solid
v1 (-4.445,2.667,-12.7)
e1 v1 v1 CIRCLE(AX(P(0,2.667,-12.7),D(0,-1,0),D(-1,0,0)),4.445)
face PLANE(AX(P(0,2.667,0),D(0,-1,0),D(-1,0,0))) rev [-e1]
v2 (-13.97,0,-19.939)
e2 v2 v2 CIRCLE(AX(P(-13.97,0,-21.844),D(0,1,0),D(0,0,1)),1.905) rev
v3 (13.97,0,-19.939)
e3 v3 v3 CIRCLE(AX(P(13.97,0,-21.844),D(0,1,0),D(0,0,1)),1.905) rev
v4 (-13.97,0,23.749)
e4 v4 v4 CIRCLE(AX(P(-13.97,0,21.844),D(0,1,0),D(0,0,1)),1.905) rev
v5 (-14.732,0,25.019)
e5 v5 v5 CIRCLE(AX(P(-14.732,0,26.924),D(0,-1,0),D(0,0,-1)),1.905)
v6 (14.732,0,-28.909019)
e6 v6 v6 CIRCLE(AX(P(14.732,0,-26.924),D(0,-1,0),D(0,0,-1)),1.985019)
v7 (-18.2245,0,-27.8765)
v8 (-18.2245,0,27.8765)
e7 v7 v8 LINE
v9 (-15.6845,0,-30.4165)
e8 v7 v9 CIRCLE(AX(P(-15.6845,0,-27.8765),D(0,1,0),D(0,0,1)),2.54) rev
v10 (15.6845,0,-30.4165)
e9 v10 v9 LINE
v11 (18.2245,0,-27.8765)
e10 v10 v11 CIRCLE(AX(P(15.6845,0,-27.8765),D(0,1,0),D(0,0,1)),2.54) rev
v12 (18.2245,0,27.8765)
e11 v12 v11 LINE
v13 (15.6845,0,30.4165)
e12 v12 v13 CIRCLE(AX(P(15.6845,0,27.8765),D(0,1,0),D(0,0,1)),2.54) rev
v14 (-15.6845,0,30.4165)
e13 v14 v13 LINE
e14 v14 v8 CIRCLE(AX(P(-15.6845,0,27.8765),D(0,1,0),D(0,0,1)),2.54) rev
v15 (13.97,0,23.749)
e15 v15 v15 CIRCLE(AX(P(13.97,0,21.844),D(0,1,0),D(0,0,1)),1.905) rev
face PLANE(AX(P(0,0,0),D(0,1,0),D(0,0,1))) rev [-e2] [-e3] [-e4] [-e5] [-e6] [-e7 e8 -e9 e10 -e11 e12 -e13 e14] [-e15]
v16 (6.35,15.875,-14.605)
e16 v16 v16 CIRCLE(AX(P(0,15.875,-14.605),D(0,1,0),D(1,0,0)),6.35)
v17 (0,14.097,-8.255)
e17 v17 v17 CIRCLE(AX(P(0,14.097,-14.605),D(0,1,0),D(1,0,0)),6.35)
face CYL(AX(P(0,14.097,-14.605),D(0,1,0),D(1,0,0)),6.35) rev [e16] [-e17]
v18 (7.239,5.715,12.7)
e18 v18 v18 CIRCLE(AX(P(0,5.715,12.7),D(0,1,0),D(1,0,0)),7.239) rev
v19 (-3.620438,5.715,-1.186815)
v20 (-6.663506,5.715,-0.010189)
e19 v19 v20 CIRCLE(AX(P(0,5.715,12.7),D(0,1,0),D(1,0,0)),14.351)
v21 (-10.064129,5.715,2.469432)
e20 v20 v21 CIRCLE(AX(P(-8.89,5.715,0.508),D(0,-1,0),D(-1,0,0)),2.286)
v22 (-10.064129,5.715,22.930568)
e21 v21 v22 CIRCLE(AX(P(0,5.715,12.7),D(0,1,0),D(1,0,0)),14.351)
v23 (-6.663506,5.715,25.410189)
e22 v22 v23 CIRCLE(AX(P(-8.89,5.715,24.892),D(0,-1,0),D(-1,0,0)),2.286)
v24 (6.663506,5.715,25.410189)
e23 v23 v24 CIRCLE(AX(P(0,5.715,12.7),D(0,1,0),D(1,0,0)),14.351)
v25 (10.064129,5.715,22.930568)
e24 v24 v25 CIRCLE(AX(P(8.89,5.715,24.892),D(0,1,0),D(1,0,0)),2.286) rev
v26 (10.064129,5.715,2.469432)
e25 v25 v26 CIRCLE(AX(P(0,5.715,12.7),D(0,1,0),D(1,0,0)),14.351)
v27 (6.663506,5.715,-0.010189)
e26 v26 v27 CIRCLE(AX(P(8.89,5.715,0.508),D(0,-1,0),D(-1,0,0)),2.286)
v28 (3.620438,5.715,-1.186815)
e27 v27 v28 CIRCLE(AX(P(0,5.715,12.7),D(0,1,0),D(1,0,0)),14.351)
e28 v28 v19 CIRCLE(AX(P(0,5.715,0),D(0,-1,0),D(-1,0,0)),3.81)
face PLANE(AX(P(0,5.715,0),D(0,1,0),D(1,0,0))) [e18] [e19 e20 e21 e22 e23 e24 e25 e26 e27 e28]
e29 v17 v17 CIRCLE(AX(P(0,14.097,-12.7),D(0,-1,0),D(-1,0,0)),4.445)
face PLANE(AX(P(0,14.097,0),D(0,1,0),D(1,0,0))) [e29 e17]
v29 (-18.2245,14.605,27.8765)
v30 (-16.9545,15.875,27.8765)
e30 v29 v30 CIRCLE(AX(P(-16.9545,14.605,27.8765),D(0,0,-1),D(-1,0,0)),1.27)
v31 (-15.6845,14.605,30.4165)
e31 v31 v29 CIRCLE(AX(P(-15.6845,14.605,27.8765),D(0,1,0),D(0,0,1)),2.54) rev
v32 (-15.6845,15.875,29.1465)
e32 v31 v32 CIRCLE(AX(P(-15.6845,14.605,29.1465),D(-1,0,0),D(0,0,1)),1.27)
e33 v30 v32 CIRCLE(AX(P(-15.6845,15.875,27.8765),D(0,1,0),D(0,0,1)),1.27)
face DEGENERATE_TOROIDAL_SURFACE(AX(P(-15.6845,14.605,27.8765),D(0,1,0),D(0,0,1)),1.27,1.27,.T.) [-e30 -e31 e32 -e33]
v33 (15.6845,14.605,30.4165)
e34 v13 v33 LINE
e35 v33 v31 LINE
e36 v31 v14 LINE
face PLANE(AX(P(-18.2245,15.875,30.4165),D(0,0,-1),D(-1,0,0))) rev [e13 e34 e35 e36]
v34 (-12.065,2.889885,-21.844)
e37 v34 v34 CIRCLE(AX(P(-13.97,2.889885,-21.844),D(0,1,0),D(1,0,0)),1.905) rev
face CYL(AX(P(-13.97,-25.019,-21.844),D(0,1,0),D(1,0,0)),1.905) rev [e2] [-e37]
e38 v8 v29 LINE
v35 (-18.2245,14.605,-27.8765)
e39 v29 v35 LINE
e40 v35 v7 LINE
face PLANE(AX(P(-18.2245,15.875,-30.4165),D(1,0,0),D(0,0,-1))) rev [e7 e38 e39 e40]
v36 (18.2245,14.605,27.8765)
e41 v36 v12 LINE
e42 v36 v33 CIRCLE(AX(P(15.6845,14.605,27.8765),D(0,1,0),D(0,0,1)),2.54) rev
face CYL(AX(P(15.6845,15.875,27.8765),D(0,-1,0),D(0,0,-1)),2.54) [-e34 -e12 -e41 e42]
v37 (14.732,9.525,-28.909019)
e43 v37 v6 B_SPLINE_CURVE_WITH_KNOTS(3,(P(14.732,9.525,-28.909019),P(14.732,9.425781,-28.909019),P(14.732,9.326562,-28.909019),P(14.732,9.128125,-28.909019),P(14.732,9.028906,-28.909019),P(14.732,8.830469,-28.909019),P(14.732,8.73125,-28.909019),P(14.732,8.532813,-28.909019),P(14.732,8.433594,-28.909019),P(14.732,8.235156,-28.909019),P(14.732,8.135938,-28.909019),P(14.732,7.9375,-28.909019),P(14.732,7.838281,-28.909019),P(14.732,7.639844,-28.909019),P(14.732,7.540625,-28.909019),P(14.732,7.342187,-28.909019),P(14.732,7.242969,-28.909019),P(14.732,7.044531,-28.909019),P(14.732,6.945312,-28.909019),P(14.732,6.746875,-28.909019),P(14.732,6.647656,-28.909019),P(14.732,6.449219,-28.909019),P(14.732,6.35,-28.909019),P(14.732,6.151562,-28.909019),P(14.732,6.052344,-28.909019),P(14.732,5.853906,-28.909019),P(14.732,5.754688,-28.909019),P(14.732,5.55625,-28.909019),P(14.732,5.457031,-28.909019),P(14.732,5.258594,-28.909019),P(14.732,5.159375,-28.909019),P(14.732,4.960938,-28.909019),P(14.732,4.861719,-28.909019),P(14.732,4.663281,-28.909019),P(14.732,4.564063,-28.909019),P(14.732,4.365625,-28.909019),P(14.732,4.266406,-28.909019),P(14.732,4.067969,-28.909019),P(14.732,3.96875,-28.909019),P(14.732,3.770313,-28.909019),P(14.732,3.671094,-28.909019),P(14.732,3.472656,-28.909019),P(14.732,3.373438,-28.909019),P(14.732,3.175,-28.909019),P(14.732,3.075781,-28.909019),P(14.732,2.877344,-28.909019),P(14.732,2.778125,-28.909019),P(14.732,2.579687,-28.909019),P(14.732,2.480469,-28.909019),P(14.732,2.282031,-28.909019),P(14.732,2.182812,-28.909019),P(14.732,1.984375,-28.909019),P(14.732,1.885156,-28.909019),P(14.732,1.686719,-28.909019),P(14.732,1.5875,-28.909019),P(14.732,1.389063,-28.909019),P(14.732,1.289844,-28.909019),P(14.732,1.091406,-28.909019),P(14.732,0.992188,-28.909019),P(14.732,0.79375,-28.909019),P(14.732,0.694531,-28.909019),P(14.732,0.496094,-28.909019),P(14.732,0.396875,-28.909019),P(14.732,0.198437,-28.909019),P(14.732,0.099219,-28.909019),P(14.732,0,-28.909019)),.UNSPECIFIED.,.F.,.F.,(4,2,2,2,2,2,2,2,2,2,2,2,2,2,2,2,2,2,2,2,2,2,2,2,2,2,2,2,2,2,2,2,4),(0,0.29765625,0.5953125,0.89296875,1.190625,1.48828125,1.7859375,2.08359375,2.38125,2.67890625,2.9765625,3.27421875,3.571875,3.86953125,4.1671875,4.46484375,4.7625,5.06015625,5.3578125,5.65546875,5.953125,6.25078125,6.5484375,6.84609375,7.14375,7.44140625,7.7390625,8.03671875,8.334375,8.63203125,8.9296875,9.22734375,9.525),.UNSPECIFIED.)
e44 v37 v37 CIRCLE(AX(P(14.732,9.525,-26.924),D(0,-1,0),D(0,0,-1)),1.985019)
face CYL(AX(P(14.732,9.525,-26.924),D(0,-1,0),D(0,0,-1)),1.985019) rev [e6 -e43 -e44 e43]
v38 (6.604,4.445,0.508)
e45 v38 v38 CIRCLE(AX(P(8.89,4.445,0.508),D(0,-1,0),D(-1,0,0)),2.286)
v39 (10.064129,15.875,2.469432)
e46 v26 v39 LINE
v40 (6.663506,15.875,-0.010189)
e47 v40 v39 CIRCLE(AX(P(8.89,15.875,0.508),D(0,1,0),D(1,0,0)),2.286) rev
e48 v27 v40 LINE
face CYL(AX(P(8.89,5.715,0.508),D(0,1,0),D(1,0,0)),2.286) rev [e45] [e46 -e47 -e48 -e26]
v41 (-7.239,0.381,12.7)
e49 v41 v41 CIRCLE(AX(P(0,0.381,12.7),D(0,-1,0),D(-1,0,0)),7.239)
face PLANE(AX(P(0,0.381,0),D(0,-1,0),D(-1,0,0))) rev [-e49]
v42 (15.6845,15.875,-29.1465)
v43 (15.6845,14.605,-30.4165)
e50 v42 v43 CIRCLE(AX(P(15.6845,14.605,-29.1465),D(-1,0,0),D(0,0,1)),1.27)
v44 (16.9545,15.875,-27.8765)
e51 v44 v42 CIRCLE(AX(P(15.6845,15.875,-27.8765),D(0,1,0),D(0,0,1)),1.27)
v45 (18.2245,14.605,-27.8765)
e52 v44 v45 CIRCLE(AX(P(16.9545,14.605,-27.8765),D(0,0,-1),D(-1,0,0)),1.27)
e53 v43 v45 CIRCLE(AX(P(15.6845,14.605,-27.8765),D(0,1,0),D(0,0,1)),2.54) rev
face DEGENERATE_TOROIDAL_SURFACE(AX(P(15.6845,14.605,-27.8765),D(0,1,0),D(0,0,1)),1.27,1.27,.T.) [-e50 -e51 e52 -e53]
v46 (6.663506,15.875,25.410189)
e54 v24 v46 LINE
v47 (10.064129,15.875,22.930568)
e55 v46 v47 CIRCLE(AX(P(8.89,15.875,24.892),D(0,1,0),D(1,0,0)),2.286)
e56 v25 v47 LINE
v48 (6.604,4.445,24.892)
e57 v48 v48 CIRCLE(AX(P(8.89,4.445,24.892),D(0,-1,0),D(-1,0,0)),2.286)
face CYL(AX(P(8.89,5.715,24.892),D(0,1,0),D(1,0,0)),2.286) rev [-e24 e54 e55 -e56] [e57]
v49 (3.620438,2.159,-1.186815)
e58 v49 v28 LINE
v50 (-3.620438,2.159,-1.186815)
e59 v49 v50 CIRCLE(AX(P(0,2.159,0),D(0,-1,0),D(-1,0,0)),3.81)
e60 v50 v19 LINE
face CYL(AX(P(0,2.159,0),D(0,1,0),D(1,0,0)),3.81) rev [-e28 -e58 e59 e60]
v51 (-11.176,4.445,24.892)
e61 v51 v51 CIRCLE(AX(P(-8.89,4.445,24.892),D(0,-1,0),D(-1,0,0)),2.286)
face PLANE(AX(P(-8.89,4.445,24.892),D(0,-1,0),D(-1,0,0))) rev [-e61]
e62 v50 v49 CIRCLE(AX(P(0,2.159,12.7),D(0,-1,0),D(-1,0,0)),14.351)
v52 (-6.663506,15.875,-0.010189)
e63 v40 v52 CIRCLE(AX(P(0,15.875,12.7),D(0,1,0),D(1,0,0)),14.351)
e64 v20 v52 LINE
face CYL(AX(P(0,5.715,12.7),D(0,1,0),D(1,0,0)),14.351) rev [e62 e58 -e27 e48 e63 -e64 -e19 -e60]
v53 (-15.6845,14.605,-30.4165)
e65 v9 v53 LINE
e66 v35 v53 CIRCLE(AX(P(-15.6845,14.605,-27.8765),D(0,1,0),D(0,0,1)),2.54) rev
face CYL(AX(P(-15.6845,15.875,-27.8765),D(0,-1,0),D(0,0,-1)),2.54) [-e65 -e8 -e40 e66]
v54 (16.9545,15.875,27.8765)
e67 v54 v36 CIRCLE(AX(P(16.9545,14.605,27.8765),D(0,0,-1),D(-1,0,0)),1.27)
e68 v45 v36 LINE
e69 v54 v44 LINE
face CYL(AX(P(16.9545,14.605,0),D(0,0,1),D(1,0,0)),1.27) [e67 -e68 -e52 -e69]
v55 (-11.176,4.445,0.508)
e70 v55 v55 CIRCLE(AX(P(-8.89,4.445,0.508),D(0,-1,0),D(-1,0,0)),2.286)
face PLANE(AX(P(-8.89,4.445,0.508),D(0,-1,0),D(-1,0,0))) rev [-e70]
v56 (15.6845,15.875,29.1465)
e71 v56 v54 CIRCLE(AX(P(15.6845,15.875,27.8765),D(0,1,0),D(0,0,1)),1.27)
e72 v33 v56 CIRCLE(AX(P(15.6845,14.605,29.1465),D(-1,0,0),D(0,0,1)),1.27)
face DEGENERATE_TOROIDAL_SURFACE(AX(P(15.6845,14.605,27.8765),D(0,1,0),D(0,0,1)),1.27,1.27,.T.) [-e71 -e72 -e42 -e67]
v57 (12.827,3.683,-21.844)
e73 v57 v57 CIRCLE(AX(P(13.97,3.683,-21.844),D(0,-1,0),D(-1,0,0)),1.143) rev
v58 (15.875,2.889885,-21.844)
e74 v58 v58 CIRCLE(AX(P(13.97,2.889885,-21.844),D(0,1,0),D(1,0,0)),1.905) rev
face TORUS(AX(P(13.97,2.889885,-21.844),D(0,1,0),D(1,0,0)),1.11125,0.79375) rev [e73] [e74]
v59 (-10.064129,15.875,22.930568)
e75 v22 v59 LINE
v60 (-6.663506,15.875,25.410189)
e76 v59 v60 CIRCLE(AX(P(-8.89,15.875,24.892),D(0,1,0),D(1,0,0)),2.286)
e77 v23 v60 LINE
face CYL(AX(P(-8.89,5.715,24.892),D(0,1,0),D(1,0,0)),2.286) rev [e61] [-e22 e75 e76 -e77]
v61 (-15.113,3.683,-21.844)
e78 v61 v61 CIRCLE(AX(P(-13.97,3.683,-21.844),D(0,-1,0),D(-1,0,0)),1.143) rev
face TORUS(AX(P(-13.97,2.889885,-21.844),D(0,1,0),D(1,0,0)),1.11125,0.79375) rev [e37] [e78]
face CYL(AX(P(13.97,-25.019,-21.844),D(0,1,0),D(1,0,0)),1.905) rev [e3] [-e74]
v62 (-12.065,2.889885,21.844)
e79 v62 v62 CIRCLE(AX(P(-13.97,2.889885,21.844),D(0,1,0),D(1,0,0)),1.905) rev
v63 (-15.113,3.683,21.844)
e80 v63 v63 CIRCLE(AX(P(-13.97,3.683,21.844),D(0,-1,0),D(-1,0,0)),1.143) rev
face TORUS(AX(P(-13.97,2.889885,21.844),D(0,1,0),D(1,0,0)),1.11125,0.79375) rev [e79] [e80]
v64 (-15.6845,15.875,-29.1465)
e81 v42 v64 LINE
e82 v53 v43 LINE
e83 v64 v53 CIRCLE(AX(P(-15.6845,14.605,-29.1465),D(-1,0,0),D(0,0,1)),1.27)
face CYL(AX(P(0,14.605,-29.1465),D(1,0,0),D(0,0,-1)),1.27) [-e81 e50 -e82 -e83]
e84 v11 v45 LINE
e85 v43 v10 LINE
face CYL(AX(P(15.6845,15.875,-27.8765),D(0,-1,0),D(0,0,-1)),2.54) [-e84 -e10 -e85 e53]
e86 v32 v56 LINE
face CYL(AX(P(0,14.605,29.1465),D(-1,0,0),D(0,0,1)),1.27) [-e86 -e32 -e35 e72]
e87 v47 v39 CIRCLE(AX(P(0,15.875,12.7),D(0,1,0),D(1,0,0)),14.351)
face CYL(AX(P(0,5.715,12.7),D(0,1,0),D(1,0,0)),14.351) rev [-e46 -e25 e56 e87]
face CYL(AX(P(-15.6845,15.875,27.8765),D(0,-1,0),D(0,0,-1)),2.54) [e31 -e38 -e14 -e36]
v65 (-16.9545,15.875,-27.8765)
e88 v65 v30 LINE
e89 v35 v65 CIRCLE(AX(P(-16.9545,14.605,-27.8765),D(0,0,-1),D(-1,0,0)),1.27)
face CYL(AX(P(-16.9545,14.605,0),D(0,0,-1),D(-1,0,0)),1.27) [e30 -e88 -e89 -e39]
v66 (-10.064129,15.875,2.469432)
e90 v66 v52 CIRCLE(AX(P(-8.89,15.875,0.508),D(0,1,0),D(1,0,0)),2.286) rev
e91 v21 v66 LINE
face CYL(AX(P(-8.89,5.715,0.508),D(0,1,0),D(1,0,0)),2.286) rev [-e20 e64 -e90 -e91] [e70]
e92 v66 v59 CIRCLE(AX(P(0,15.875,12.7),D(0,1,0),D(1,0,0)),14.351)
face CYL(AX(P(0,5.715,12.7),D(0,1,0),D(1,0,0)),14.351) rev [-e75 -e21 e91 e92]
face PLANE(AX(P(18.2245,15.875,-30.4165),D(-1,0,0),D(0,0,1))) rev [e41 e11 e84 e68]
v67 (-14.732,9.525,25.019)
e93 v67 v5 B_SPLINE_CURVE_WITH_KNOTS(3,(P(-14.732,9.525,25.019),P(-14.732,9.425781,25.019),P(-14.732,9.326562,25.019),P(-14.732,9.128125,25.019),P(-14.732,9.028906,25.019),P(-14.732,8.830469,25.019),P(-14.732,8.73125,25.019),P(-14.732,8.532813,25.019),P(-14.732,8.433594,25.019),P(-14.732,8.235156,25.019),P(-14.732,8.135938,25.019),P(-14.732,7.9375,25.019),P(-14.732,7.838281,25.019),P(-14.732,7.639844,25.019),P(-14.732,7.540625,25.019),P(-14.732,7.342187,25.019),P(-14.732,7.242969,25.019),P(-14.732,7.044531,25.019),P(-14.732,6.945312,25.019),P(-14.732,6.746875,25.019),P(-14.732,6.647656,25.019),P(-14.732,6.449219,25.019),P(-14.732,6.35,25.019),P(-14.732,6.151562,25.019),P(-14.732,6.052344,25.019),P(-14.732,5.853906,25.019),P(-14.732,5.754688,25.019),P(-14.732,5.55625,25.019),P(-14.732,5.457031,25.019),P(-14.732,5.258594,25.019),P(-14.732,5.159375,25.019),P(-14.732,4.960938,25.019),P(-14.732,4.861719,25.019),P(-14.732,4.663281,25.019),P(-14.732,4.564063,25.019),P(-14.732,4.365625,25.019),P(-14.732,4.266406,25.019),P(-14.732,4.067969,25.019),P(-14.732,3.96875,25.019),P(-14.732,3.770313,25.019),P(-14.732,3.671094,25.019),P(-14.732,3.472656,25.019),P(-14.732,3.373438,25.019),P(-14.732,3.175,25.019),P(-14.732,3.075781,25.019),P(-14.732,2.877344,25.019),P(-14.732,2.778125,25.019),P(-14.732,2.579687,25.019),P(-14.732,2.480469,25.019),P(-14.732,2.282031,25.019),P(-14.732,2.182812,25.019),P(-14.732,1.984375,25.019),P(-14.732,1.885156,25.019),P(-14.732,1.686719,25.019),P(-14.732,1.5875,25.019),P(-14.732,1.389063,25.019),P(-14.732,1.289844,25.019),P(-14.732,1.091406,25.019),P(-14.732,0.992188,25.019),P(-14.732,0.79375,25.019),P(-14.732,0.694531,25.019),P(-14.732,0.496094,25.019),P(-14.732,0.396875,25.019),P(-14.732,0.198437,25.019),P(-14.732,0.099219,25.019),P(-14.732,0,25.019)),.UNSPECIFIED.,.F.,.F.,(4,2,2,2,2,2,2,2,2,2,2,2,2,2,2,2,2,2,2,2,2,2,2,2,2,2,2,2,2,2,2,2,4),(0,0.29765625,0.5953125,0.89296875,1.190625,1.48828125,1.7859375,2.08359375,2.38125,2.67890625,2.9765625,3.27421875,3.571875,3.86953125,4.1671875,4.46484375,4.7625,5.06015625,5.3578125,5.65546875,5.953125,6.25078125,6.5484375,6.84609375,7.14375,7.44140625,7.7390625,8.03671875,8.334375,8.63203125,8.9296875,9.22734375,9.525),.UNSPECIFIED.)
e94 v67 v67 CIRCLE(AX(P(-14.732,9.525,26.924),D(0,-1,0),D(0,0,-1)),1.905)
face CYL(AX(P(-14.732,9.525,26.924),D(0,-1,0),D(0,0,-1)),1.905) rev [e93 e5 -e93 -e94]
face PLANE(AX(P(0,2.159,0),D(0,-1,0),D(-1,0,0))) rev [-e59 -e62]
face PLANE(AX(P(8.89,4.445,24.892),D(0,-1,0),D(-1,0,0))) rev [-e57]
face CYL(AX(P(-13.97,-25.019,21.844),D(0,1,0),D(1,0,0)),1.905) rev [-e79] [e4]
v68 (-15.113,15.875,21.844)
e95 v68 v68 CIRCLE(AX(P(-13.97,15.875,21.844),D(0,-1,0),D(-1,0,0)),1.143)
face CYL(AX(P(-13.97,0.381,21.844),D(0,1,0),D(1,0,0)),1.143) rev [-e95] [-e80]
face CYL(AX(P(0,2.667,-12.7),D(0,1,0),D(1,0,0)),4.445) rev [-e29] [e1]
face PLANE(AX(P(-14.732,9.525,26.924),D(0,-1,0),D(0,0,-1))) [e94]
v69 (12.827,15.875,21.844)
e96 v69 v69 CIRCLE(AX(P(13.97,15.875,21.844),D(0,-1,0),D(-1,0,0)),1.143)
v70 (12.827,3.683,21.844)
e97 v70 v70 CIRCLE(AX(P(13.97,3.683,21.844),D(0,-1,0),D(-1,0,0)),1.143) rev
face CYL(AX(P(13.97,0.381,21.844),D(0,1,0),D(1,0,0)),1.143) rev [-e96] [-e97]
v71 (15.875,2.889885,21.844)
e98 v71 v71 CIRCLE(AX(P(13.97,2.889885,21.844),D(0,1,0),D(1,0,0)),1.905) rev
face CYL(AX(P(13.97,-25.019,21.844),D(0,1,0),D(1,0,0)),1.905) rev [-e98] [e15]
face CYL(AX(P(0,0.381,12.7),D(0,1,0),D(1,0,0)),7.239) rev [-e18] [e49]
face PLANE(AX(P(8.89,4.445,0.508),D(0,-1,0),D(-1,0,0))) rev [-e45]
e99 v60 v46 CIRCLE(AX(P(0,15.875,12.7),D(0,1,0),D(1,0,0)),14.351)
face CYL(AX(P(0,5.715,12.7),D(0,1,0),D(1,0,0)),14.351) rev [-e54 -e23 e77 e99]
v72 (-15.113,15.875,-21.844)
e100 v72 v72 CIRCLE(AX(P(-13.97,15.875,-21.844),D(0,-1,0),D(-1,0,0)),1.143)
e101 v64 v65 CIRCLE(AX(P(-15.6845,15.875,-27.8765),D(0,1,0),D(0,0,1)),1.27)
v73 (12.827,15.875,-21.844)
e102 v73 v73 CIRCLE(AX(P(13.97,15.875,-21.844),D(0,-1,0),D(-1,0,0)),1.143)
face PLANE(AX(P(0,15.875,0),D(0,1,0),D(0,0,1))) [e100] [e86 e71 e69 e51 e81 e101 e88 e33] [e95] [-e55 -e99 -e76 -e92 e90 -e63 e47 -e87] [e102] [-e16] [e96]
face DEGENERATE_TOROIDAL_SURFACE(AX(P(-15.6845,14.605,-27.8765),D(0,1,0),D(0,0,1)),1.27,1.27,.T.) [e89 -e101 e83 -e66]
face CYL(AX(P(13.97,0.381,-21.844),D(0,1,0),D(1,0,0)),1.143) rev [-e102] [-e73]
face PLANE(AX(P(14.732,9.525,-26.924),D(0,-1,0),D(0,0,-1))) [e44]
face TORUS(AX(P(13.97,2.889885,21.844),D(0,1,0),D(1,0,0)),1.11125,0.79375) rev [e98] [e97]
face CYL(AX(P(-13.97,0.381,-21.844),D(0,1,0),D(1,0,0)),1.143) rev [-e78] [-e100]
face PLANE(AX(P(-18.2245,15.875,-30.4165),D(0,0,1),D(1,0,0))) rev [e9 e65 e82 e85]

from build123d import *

# Parameters (mm, degrees)
SKETCH1_W           = 36.449
SKETCH1_H           = 60.833
BOSS_EXTRUDE1_DEPTH = 15.875
CAVITY1_START       = 5.715
CAVITY1_OUTLINE_R   = 4.445
CAVITY1_DEPTH       = 10.16
CAVITY1_START_2     = 0.381
CAVITY1_2_OUTLINE_R = 7.239
CAVITY1_2_DEPTH     = 5.334
CAVITY1_START_3     = 2.667
CAVITY1_3_OUTLINE_R = 4.445
CAVITY1_3_DEPTH     = 3.048
CAVITY1_START_4     = 14.097
CAVITY1_4_DEPTH     = 1.778
CAVITY1_START_5     = 4.445
CAVITY1_5_OUTLINE_R = 2.286
CAVITY1_5_DEPTH     = 1.27
CAVITY1_START_6     = 2.159
CAVITY1_6_DEPTH     = 0.508
FILLET1_R           = 2.54
SKETCH5_R           = 1.905
SKETCH5_R_2         = 1.985019455
CUT_EXTRUDE1_DEPTH  = 9.525
FILLET2_R           = 1.27


# Read off the part's stored shape, not the designer's step: Cavity1
with BuildPart() as part:
    # Sketch1 → Boss-Extrude1 (new body)
    with BuildSketch(Plane(origin=(0, 0, 0), x_dir=(1, 0, 0), z_dir=(0, 1, 0))):
        Rectangle(SKETCH1_W, SKETCH1_H)
    extrude(amount=BOSS_EXTRUDE1_DEPTH)

    # Cavity1 outline → Cavity1 (cut)
    with BuildSketch(Plane(origin=(0, 0, 0), x_dir=(1, 0, 0), z_dir=(0, 1, 0)).offset(CAVITY1_START)):
        with BuildLine():
            ThreePointArc((6.663505747, 0.010188518), (0, 1.651), (-6.663505747, 0.010188518))
            ThreePointArc((-6.663505747, 0.010188518), (-10.236847552, 1.339105214), (-10.064128852, -2.469432496))
            ThreePointArc((-10.064128852, -2.469432496), (-14.351, -12.7), (-10.064128852, -22.930567504))
            ThreePointArc((-10.064128852, -22.930567504), (-10.236847552, -26.739105214), (-6.663505747, -25.410188518))
            ThreePointArc((-6.663505747, -25.410188518), (0, -27.051), (6.663505747, -25.410188518))
            ThreePointArc((6.663505747, -25.410188518), (10.236847552, -26.739105214), (10.064128852, -22.930567504))
            ThreePointArc((10.064128852, -22.930567504), (14.351, -12.7), (10.064128852, -2.469432496))
            ThreePointArc((10.064128852, -2.469432496), (10.236847552, 1.339105214), (6.663505747, 0.010188518))
        make_face()
        with Locations((0, 12.7)):
            Circle(CAVITY1_OUTLINE_R)
    extrude(amount=CAVITY1_DEPTH, mode=Mode.SUBTRACT)

    # Cavity1 2 outline → Cavity1 2 (cut)
    with BuildSketch(Plane(origin=(0, 0, 0), x_dir=(1, 0, 0), z_dir=(0, 1, 0)).offset(CAVITY1_START_2)):
        with Locations((0, -12.7)):
            Circle(CAVITY1_2_OUTLINE_R)
    extrude(amount=CAVITY1_2_DEPTH, mode=Mode.SUBTRACT)

    # Cavity1 3 outline → Cavity1 3 (cut)
    with BuildSketch(Plane(origin=(0, 0, 0), x_dir=(1, 0, 0), z_dir=(0, 1, 0)).offset(CAVITY1_START_3)):
        with BuildLine():
            ThreePointArc((3.62043784, 1.186815), (0, 1.651), (-3.62043784, 1.186815))
            ThreePointArc((-3.62043784, 1.186815), (0, -3.81), (3.62043784, 1.186815))
        make_face()
        with Locations((0, 12.7)):
            Circle(CAVITY1_3_OUTLINE_R)
    extrude(amount=CAVITY1_3_DEPTH, mode=Mode.SUBTRACT)

    # Cavity1 4 outline → Cavity1 4 (cut)
    with BuildSketch(Plane(origin=(0, 0, 0), x_dir=(1, 0, 0), z_dir=(0, 1, 0)).offset(CAVITY1_START_4)):
        with BuildLine():
            Line((-1.245086436, 8.432941907), (-1.261900971, 8.381648336))
            ThreePointArc((-1.261900971, 8.381648336), (-1.083049158, 8.34804351), (-0.903307825, 8.319577582))
            Line((-0.903307825, 8.319577582), (-0.939813075, 8.355488936))
            ThreePointArc((-0.939813075, 8.355488936), (-1.093135951, 8.391510846), (-1.245086436, 8.432941907))
        make_face()
        with BuildLine():
            ThreePointArc((-6.269761763, 13.598725967), (-4.581043619, 10.20766679), (-1.261900971, 8.381648336))
            Line((-1.261900971, 8.381648336), (-1.245086436, 8.432941907))
            ThreePointArc((-1.245086436, 8.432941907), (-3.227510815, 9.643662496), (-4.32851275, 11.689058668))
            Line((-4.32851275, 11.689058668), (-6.269761763, 13.598725967))
        make_face()
        with BuildLine():
            Line((1.245086436, 8.432941907), (1.261900971, 8.381648336))
            ThreePointArc((1.261900971, 8.381648336), (4.581043619, 10.20766679), (6.269761763, 13.598725967))
            Line((6.269761763, 13.598725967), (4.32851275, 11.689058668))
            ThreePointArc((4.32851275, 11.689058668), (3.227510815, 9.643662496), (1.245086436, 8.432941907))
        make_face()
        with BuildLine():
            ThreePointArc((0.903307825, 8.319577582), (1.083049158, 8.34804351), (1.261900971, 8.381648336))
            Line((1.261900971, 8.381648336), (1.245086436, 8.432941907))
            ThreePointArc((1.245086436, 8.432941907), (1.093135951, 8.391510846), (0.939813075, 8.355488936))
            Line((0.939813075, 8.355488936), (0.903307825, 8.319577582))
        make_face()
        with BuildLine():
            ThreePointArc((-2.667234262, 20.367669641), (-5.605544051, 17.588349777), (-6.269761763, 13.598725967))
            Line((-6.269761763, 13.598725967), (-4.32851275, 11.689058668))
            ThreePointArc((-4.32851275, 11.689058668), (-3.909642573, 14.8148806), (-1.522653339, 16.876068942))
            Line((-1.522653339, 16.876068942), (-2.667234262, 20.367669641))
        make_face()
        with BuildLine():
            Line((-0.939813075, 8.355488936), (-0.903307825, 8.319577582))
            ThreePointArc((-0.903307825, 8.319577582), (-0.452806615, 8.271164971), (-1.8e-08, 8.255))
            ThreePointArc((-1.8e-08, 8.255), (-0.472585091, 8.280193632), (-0.939813075, 8.355488936))
        make_face()
        with BuildLine():
            ThreePointArc((-1.8e-08, 8.255), (0.452806598, 8.27116497), (0.903307825, 8.319577582))
            Line((0.903307825, 8.319577582), (0.939813075, 8.355488936))
            ThreePointArc((0.939813075, 8.355488936), (0.472585074, 8.28019363), (-1.8e-08, 8.255))
        make_face()
        with BuildLine():
            Line((4.32851275, 11.689058668), (6.269761763, 13.598725967))
            ThreePointArc((6.269761763, 13.598725967), (6.329908656, 14.100266009), (6.35, 14.605))
            ThreePointArc((6.35, 14.605), (5.35067461, 18.024470897), (2.667234262, 20.367669641))
            Line((2.667234262, 20.367669641), (1.522653339, 16.876068942))
            ThreePointArc((1.522653339, 16.876068942), (3.641855234, 15.2485124), (4.445, 12.7))
            ThreePointArc((4.445, 12.7), (4.41578216, 12.191184794), (4.32851275, 11.689058668))
        make_face()
        with BuildLine():
            ThreePointArc((2.667234262, 20.367669641), (0, 20.955), (-2.667234262, 20.367669641))
            Line((-2.667234262, 20.367669641), (-1.522653339, 16.876068942))
            ThreePointArc((-1.522653339, 16.876068942), (0, 17.145), (1.522653339, 16.876068942))
            Line((1.522653339, 16.876068942), (2.667234262, 20.367669641))
        make_face()
    extrude(amount=CAVITY1_4_DEPTH, mode=Mode.SUBTRACT)

    # Cavity1 5 outline → Cavity1 5 (cut)
    with BuildSketch(Plane(origin=(0, 0, 0), x_dir=(1, 0, 0), z_dir=(0, 1, 0)).offset(CAVITY1_START_5)):
        with Locations((-8.89, -0.508)):
            Circle(CAVITY1_5_OUTLINE_R)
        with Locations((8.89, -0.508)):
            Circle(CAVITY1_5_OUTLINE_R)
        with Locations((8.89, -24.892)):
            Circle(CAVITY1_5_OUTLINE_R)
        with Locations((-8.89, -24.892)):
            Circle(CAVITY1_5_OUTLINE_R)
    extrude(amount=CAVITY1_5_DEPTH, mode=Mode.SUBTRACT)

    # Cavity1 6 outline → Cavity1 6 (cut)
    with BuildSketch(Plane(origin=(0, 0, 0), x_dir=(1, 0, 0), z_dir=(0, 1, 0)).offset(CAVITY1_START_6)):
        with BuildLine():
            ThreePointArc((3.62043784, 1.186815), (0, 1.651), (-3.62043784, 1.186815))
            ThreePointArc((-3.62043784, 1.186815), (0, -3.81), (3.62043784, 1.186815))
        make_face()
    extrude(amount=CAVITY1_6_DEPTH, mode=Mode.SUBTRACT)

    # Cavity1 7 outline → Cavity1 7 (revolve, cut)
    with BuildSketch(Plane(origin=(13.97, 0, 21.844), x_dir=(1, 0, 0), z_dir=(0, 0, 1))):
        with BuildLine():
            Line((0, 0), (1.905, 0))
            Line((1.905, 0), (1.905, 2.889885254))
            ThreePointArc((1.905, 2.889885254), (1.683631265, 3.439811386), (1.143, 3.683))
            Line((1.143, 3.683), (1.143, 15.875))
            Line((1.143, 15.875), (0, 15.875))
            Line((0, 15.875), (0, 0))
        make_face()
    revolve(axis=Axis((13.97, 0, 21.844), (0, 1, 0)), mode=Mode.SUBTRACT)

    # Cavity1 8 outline → Cavity1 8 (revolve, cut)
    with BuildSketch(Plane(origin=(-13.97, 0, 21.844), x_dir=(1, 0, 0), z_dir=(0, 0, 1))):
        with BuildLine():
            Line((0, 0), (1.905, 0))
            Line((1.905, 0), (1.905, 2.889885254))
            ThreePointArc((1.905, 2.889885254), (1.683631265, 3.439811386), (1.143, 3.683))
            Line((1.143, 3.683), (1.143, 15.875))
            Line((1.143, 15.875), (0, 15.875))
            Line((0, 15.875), (0, 0))
        make_face()
    revolve(axis=Axis((-13.97, 0, 21.844), (0, 1, 0)), mode=Mode.SUBTRACT)

    # Cavity1 9 outline → Cavity1 9 (revolve, cut)
    with BuildSketch(Plane(origin=(-13.97, 0, -21.844), x_dir=(1, 0, 0), z_dir=(0, 0, 1))):
        with BuildLine():
            Line((0, 0), (1.905, 0))
            Line((1.905, 0), (1.905, 2.889885254))
            ThreePointArc((1.905, 2.889885254), (1.683631265, 3.439811386), (1.143, 3.683))
            Line((1.143, 3.683), (1.143, 15.875))
            Line((1.143, 15.875), (0, 15.875))
            Line((0, 15.875), (0, 0))
        make_face()
    revolve(axis=Axis((-13.97, 0, -21.844), (0, 1, 0)), mode=Mode.SUBTRACT)

    # Cavity1 10 outline → Cavity1 10 (revolve, cut)
    with BuildSketch(Plane(origin=(13.97, 0, -21.844), x_dir=(1, 0, 0), z_dir=(0, 0, 1))):
        with BuildLine():
            Line((0, 0), (1.905, 0))
            Line((1.905, 0), (1.905, 2.889885254))
            ThreePointArc((1.905, 2.889885254), (1.683631265, 3.439811386), (1.143, 3.683))
            Line((1.143, 3.683), (1.143, 15.875))
            Line((1.143, 15.875), (0, 15.875))
            Line((0, 15.875), (0, 0))
        make_face()
    revolve(axis=Axis((13.97, 0, -21.844), (0, 1, 0)), mode=Mode.SUBTRACT)

    # Fillet1
    fillet1_edges = [part.edges().sort_by_distance(p)[0] for p in [
        (18.2245, 7.9375, 30.4165),
        (-18.2245, 7.9375, 30.4165),
        (-18.2245, 7.9375, -30.4165),
        (18.2245, 7.9375, -30.4165),
    ]]
    fillet(fillet1_edges, radius=FILLET1_R)

    # Sketch5 → Cut-Extrude1 (cut)
    with BuildSketch(Plane.XZ):
        with Locations(Location((-14.732, 26.924, 0), (0, 0, 270))):
            Circle(SKETCH5_R)
        with Locations(Location((14.732, -26.924, 0), (0, 0, 270))):
            Circle(SKETCH5_R_2)
    extrude(amount=-CUT_EXTRUDE1_DEPTH, mode=Mode.SUBTRACT)

    # Fillet2
    fillet2_edges = [part.edges().sort_by_distance(p)[0] for p in [
        (-18.2245, 15.875, 0),
        (0, 15.875, -30.4165),
        (18.2245, 15.875, 0),
        (0, 15.875, 30.4165),
        (-17.480551224, 15.875, 29.672551224),
        (17.480551224, 15.875, 29.672551224),
        (17.480551224, 15.875, -29.672551224),
        (-17.480551224, 15.875, -29.672551224),
    ]]
    fillet(fillet2_edges, radius=FILLET2_R)


solid = part.part
